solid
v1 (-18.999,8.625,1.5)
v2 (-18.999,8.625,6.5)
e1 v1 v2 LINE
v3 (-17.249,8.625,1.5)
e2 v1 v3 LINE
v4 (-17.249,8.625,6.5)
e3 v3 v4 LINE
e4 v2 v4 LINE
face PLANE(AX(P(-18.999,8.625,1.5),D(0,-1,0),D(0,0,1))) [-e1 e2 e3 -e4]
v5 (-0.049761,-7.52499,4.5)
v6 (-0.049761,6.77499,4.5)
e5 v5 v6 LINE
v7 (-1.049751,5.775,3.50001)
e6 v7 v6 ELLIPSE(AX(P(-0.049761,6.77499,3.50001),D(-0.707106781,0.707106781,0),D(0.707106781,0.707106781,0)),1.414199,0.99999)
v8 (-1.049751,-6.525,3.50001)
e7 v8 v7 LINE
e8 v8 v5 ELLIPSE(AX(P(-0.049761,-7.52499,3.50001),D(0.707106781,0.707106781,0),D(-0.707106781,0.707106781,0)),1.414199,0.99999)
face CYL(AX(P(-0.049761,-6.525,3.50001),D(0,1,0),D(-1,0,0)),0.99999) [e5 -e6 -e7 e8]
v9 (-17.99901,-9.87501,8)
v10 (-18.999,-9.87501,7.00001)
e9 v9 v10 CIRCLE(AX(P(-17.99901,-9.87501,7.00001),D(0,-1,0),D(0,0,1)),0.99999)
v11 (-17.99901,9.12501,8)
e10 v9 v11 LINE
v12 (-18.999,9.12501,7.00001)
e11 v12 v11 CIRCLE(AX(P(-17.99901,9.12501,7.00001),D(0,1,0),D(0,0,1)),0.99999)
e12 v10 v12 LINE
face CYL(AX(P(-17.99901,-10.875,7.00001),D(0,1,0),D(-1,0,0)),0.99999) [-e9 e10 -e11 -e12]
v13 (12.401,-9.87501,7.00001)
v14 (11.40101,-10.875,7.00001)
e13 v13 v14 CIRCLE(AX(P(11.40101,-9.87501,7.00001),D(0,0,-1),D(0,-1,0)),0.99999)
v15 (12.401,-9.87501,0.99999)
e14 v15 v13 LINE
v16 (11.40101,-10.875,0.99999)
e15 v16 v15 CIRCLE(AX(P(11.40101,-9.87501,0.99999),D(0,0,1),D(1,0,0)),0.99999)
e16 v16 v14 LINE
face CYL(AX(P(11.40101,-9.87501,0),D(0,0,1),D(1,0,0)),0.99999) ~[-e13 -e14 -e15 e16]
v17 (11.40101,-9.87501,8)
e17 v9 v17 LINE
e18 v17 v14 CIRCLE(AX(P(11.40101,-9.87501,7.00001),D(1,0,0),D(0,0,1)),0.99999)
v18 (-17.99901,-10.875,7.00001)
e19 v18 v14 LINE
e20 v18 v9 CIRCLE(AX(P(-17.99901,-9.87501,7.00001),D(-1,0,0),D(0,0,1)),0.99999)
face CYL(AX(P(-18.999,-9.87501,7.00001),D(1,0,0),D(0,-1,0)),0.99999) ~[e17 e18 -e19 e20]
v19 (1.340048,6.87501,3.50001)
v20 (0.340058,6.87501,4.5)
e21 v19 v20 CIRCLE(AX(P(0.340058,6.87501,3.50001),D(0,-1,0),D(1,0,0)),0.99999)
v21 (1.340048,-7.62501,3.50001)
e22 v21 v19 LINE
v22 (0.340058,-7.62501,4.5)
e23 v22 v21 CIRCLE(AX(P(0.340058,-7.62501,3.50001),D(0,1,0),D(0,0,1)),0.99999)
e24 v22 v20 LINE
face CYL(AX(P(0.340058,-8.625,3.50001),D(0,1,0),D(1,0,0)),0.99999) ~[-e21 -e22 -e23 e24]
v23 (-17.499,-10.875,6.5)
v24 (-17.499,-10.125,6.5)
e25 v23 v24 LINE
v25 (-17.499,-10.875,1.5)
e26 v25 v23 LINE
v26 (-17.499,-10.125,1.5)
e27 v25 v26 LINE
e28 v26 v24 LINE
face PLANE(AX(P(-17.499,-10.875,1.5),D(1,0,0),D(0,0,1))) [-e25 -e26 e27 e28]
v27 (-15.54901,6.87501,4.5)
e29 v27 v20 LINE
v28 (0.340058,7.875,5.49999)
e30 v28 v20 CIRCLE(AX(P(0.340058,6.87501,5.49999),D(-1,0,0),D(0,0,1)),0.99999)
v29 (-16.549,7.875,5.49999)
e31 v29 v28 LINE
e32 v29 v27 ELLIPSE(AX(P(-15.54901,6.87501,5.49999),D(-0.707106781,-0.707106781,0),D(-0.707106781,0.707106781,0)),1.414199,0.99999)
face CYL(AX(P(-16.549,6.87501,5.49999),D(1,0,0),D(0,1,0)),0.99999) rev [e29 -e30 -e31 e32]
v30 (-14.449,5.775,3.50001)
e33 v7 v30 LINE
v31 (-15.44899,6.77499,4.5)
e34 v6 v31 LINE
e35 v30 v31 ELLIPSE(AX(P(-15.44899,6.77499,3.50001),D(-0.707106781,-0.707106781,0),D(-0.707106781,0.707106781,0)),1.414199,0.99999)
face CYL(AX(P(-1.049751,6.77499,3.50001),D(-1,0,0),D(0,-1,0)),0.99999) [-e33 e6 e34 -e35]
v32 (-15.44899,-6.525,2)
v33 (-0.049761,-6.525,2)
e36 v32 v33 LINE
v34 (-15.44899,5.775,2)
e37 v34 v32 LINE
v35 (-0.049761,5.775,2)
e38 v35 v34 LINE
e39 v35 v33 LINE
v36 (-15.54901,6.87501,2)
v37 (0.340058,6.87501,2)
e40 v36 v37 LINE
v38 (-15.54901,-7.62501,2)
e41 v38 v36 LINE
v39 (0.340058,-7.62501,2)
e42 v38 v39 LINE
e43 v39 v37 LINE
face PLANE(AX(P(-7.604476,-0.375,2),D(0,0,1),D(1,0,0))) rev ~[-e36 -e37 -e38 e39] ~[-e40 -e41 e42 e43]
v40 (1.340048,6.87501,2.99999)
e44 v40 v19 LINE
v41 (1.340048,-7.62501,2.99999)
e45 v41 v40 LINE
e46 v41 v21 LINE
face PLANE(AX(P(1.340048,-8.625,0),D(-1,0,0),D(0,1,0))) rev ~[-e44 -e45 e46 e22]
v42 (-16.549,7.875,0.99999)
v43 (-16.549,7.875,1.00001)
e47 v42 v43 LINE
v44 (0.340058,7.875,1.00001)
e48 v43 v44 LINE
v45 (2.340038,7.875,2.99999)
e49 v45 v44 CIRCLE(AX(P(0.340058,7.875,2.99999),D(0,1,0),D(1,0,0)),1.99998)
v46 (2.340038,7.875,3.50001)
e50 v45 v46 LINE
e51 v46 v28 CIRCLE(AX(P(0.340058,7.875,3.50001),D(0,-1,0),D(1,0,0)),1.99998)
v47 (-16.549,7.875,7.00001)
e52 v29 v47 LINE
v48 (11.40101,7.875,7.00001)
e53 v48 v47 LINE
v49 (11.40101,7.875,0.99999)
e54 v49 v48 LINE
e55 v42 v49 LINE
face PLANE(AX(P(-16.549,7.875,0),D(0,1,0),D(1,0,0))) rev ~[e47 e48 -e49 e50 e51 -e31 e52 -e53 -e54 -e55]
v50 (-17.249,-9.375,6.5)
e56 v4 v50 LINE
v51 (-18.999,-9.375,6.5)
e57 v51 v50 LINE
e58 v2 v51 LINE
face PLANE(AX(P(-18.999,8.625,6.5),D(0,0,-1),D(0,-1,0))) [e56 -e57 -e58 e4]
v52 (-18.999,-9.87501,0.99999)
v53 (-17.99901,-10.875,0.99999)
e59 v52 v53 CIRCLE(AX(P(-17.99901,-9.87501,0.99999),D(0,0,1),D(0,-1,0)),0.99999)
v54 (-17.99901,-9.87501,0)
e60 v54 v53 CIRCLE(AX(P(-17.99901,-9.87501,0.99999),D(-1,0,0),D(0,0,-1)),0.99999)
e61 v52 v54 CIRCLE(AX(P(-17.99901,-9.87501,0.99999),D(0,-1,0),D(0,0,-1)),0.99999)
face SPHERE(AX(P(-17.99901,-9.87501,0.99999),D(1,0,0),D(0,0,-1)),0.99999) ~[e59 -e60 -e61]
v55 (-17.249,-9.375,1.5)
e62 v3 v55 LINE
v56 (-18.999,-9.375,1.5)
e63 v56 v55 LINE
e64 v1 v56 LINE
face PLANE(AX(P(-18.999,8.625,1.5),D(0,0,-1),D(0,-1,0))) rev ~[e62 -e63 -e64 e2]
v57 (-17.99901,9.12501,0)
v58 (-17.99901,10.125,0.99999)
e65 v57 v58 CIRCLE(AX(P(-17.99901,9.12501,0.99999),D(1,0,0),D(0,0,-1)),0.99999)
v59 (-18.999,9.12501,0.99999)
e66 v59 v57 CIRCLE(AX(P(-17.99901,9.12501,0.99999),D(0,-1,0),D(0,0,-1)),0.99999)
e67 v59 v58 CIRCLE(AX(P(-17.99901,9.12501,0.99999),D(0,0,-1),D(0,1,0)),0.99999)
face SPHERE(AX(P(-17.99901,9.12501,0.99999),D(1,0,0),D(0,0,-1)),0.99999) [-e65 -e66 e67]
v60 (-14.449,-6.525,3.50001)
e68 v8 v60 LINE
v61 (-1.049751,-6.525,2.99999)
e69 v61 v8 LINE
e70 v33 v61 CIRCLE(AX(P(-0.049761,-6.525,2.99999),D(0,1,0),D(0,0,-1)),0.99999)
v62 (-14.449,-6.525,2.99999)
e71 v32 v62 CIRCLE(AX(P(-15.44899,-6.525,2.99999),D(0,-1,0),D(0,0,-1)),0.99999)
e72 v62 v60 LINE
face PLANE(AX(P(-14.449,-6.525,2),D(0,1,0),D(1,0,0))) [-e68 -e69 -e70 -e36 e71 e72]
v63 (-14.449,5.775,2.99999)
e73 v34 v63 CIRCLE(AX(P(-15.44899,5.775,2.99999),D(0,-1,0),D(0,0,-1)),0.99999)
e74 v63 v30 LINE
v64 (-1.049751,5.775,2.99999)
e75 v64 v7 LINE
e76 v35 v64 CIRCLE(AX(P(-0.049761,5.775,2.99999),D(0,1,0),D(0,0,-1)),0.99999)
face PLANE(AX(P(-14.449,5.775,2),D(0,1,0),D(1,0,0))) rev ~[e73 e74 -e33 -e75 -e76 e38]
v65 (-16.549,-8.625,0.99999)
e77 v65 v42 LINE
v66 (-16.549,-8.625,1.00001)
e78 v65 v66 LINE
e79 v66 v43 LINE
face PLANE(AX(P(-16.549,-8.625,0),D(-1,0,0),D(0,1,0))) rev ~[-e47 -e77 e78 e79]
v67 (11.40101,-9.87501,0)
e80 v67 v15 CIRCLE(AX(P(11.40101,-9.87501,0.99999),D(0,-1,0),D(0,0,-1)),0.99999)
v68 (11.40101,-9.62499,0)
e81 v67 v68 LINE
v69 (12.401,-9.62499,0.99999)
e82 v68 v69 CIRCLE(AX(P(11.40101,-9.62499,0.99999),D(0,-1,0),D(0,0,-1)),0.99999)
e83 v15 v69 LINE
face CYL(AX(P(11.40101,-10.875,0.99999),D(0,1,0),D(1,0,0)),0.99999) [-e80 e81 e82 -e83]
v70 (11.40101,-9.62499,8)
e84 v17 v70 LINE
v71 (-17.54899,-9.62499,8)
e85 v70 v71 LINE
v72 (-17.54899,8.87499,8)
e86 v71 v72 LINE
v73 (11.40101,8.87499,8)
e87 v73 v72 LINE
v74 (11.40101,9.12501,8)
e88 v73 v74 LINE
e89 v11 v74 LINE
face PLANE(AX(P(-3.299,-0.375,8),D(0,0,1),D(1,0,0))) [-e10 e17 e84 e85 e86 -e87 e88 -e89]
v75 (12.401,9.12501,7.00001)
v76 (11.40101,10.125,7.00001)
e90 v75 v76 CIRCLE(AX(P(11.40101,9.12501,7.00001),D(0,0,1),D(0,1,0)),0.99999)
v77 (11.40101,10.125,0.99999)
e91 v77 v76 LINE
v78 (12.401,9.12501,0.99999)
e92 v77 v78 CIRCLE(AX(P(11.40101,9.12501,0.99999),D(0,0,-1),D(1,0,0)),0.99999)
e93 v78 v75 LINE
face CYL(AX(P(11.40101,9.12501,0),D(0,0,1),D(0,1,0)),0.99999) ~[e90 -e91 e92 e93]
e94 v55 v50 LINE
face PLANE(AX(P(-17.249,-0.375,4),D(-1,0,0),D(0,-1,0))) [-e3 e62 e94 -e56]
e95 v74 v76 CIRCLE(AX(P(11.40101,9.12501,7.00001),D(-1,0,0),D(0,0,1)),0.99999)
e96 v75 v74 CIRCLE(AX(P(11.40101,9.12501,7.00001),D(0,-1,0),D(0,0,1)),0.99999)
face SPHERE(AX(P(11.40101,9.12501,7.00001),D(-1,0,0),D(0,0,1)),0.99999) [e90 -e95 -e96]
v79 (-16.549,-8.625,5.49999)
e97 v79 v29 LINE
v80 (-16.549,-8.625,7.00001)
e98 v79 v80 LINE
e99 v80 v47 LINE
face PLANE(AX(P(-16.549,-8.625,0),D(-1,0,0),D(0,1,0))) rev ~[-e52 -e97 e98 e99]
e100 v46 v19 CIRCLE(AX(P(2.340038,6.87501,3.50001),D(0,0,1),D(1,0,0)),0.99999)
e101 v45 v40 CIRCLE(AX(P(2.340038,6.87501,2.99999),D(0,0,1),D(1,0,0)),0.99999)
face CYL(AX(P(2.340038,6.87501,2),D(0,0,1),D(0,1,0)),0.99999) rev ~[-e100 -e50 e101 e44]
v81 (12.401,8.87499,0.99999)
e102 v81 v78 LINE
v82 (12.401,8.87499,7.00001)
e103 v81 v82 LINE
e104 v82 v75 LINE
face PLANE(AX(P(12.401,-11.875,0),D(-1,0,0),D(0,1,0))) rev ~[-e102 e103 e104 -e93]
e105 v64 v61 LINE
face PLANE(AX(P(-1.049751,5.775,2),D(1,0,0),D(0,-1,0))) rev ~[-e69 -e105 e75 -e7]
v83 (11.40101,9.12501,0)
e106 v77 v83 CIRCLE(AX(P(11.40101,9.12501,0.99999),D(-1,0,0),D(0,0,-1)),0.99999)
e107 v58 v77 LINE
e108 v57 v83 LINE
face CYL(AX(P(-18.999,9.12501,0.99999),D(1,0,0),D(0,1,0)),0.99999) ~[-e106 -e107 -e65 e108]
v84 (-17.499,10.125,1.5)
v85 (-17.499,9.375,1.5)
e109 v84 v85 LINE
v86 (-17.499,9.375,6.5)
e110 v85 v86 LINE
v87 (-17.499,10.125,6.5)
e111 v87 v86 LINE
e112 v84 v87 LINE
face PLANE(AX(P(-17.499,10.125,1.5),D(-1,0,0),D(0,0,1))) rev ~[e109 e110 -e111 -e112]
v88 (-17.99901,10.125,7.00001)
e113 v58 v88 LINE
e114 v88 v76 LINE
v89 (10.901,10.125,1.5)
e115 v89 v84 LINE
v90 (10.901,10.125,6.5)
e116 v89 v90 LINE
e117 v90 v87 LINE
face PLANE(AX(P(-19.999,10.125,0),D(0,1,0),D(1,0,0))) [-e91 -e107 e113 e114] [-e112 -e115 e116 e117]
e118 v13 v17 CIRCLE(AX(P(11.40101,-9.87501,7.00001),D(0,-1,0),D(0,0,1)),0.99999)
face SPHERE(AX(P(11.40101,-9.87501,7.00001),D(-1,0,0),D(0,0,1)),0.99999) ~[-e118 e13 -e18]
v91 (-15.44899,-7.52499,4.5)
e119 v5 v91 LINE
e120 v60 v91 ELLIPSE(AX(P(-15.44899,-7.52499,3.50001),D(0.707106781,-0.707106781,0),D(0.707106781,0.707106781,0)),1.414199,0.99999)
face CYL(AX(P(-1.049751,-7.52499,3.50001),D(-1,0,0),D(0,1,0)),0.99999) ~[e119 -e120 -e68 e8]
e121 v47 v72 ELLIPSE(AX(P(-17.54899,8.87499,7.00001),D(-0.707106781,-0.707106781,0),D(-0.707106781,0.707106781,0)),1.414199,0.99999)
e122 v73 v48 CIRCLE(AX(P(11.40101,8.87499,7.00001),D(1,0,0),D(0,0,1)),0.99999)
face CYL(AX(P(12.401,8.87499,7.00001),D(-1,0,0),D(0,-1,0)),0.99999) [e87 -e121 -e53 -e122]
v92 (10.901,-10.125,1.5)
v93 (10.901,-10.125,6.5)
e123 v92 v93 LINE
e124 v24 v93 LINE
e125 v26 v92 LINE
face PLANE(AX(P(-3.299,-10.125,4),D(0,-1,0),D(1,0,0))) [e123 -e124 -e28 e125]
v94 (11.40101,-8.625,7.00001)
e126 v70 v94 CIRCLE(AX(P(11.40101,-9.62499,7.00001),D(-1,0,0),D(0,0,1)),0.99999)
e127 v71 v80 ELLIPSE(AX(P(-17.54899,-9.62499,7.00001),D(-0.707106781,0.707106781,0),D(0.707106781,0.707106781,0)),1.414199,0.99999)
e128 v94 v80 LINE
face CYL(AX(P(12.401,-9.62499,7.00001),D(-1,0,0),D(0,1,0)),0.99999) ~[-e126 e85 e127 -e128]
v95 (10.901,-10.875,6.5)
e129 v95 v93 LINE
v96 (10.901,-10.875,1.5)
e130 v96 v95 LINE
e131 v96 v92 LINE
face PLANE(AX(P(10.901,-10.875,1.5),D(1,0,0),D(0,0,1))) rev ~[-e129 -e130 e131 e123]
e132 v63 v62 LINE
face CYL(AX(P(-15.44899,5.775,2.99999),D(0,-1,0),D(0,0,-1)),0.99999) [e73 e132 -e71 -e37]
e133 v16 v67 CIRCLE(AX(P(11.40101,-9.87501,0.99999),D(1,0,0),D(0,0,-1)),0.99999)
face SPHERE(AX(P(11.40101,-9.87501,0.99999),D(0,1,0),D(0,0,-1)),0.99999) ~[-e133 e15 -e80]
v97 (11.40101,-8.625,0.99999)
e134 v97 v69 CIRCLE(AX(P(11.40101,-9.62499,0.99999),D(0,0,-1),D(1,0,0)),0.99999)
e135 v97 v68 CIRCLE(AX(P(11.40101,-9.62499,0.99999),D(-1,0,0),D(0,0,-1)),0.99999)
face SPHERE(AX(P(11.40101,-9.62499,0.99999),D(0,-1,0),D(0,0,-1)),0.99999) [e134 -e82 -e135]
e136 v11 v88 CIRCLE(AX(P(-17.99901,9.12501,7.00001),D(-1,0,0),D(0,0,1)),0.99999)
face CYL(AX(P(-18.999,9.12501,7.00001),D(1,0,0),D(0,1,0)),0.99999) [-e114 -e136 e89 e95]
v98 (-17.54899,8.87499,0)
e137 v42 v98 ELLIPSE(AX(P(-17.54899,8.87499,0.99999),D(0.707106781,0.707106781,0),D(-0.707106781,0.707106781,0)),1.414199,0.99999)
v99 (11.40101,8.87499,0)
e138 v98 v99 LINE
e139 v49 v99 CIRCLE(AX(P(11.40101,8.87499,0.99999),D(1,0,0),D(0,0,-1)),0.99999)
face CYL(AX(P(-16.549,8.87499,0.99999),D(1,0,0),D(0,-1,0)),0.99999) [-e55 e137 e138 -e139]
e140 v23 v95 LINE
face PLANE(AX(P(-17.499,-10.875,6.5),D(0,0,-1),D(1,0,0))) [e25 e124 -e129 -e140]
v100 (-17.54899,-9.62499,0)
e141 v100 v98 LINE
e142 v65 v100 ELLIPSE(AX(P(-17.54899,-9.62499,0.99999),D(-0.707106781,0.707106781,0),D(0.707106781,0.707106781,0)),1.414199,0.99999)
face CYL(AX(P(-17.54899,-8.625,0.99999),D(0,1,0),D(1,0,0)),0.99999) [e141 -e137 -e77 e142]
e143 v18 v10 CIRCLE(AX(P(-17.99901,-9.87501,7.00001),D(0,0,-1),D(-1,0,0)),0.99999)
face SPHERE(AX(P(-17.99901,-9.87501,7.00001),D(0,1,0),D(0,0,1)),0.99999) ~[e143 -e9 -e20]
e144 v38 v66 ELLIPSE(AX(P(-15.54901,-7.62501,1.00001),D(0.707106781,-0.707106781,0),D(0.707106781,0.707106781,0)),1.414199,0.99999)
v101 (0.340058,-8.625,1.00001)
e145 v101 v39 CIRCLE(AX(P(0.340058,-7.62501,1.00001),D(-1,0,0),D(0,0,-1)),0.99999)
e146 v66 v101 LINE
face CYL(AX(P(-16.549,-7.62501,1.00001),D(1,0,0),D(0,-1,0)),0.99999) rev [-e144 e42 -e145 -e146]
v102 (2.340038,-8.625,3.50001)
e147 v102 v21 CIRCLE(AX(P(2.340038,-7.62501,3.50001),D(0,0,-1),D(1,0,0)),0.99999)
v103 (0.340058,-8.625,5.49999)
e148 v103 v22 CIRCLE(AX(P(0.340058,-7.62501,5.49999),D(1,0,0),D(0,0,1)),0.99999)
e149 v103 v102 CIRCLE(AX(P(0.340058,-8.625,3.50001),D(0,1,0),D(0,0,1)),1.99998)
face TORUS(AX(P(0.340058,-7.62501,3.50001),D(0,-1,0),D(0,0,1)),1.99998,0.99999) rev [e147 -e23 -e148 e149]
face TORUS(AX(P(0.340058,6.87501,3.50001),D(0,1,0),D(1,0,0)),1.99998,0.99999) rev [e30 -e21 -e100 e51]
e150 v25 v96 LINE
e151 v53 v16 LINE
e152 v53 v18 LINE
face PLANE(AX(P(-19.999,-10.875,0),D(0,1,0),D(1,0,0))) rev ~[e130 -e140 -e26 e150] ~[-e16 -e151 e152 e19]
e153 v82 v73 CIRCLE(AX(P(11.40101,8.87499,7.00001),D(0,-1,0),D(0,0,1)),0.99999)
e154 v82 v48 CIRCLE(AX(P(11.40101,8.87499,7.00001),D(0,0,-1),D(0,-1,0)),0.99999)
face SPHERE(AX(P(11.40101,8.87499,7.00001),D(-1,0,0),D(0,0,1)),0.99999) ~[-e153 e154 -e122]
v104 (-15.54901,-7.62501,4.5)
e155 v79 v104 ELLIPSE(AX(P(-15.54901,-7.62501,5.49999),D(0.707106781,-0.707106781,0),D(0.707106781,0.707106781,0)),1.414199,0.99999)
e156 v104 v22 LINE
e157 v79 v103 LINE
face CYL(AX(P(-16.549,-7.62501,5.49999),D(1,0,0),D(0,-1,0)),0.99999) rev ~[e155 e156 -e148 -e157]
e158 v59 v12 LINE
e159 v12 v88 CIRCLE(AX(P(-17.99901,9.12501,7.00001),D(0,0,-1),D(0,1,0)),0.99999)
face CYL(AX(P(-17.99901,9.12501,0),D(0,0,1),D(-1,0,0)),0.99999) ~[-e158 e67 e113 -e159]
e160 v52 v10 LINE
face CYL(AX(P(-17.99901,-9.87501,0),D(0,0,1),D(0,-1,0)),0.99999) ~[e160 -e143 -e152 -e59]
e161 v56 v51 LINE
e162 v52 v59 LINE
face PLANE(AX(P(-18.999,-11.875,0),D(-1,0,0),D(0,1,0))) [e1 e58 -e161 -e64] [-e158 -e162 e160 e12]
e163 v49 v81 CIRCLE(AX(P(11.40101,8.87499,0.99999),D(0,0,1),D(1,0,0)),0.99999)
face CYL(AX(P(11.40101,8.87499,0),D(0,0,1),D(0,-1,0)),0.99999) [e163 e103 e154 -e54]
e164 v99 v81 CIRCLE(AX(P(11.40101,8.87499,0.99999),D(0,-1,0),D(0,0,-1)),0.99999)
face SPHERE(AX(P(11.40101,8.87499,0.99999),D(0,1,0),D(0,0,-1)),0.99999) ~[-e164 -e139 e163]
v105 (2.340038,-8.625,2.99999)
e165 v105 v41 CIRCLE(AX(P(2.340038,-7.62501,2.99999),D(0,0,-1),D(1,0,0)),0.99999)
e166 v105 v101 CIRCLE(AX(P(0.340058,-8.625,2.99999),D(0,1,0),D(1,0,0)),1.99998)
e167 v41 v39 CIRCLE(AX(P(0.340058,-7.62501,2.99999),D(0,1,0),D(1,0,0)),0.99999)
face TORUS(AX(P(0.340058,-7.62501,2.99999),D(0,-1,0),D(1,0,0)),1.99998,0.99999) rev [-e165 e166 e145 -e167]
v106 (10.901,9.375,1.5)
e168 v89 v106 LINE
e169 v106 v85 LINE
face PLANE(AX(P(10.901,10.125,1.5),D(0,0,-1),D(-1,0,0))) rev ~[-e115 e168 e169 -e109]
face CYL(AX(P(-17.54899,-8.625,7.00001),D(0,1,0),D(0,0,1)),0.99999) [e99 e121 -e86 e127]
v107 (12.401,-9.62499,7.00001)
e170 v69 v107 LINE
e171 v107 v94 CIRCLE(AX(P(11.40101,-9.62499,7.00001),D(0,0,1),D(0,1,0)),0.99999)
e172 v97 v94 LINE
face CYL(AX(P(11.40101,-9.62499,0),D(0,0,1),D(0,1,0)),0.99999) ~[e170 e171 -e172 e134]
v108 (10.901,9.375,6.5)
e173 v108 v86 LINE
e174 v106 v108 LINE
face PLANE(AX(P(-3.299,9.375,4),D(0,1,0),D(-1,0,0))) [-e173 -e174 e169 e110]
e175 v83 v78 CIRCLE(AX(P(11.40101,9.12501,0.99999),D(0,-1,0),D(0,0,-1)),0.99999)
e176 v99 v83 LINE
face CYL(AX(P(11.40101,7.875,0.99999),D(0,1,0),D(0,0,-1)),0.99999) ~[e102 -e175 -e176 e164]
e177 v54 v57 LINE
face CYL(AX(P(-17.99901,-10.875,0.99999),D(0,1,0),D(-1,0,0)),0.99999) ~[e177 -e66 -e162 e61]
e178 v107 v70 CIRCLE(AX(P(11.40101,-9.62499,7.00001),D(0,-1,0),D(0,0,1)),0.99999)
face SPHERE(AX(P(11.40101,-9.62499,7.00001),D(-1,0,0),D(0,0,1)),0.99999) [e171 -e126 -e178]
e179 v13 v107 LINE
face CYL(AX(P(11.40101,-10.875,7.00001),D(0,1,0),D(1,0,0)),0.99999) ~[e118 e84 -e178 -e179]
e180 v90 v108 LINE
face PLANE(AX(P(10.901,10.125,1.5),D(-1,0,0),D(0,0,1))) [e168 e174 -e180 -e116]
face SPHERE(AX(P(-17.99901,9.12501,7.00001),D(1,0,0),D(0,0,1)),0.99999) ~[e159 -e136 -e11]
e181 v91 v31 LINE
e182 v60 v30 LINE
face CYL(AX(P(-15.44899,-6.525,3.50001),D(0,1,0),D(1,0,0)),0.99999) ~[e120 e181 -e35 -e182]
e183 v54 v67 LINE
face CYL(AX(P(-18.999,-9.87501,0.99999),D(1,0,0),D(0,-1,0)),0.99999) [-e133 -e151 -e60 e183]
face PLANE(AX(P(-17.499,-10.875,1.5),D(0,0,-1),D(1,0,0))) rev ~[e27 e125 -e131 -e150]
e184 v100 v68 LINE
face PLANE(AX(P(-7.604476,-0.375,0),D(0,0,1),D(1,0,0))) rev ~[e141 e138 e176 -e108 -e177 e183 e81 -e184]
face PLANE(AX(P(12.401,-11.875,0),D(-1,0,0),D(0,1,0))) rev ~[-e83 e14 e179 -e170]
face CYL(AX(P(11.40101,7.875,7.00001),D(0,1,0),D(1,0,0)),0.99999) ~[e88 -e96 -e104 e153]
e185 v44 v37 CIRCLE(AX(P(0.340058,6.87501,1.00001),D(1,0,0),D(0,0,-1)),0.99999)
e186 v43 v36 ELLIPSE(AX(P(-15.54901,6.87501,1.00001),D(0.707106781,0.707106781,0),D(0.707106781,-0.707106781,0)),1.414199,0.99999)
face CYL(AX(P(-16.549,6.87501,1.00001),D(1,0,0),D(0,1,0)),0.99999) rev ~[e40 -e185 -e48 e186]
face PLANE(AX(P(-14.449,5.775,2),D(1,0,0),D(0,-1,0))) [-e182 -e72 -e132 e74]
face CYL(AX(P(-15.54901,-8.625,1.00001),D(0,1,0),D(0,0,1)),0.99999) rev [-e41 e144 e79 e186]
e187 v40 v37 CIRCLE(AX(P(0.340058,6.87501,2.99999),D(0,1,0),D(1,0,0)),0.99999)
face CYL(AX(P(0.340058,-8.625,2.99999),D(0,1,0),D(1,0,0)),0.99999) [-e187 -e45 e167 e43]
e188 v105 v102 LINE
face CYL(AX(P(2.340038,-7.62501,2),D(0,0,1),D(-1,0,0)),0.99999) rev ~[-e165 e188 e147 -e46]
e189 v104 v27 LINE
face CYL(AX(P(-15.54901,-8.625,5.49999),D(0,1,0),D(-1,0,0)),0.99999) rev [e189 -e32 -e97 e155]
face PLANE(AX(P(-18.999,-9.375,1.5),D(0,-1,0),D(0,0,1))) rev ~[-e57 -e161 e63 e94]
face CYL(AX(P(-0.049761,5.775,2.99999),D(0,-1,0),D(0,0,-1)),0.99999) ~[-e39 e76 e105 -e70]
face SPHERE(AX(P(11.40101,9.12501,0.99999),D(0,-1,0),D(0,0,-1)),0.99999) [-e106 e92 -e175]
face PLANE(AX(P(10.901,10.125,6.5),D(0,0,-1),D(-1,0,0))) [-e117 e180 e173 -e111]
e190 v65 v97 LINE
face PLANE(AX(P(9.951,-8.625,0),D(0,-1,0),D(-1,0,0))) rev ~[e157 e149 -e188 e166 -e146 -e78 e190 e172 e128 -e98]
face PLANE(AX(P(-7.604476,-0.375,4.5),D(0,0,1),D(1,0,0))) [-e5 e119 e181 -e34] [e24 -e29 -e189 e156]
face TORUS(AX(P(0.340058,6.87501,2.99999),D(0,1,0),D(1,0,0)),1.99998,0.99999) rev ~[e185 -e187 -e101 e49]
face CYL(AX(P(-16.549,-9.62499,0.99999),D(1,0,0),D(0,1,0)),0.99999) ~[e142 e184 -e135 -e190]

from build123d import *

# Parameters (mm, degrees)
F0_W      = 33.4
F0_H      = 23
F1_DEPTH  = 8
F0_W_2    = 17.8890476892
F0_H_2    = 16.5
F2_DEPTH  = 4.5
F3_DEPTH  = 1
F4_DEPTH  = 1
F5_DEPTH  = 1
F6_DEPTH  = 1
F7_DEPTH  = 2
F8_W      = 13.3992488682
F8_H      = 12.2999999374
F9_DEPTH  = 3.4
F11_W     = 28.4
F11_H     = 5
F12_DEPTH = 0.75
F13_W     = 28.4
F13_H     = 5
F14_DEPTH = 0.75
F15_W     = 18
F15_H     = 5
F16_DEPTH = 1.75
F10_W     = 16.5
F10_H     = 8
F17_DEPTH = 2.5
F18_R     = 0.99999


# Not quite as in the source:
# - a fillet or chamfer is up to 0.001 mm smaller than in the source, because OpenCascade refuses the exact size
# - a feature names something its author has since deleted; it is built from what else it names


with BuildPart() as f1:
    # F0 (on Top) → F1 (new body)
    with BuildSketch(Plane.XY):
        with Locations((-3.299, -0.375)):
            Rectangle(F0_W, F0_H)
        Polygon((1.3400476892, 7.875), (9.951, 7.875), (9.951, -8.625), (1.3400476892, -8.625), (-16.549, -8.625), (-16.549, 7.875), align=None, mode=Mode.SUBTRACT)
    extrude(amount=F1_DEPTH)

    # F0 (on Top) → F2 (join)
    with BuildSketch(Plane.XY):
        with Locations((-7.6044761554, -0.375)):
            Rectangle(F0_W_2, F0_H_2)
    extrude(amount=F2_DEPTH)

    # F3 (cut): a face of the model
    f3_faces = [f1.faces().sort_by_distance(p)[0] for p in [
        (-3.299, -11.875, 4),
    ]]
    extrude(f3_faces, amount=-F3_DEPTH, mode=Mode.SUBTRACT)

    # F4 (cut): a face of the model
    f4_faces = [f1.faces().sort_by_distance(p)[0] for p in [
        (13.401, 0.125, 4),
    ]]
    extrude(f4_faces, amount=-F4_DEPTH, mode=Mode.SUBTRACT)

    # F5 (cut): a face of the model
    f5_faces = [f1.faces().sort_by_distance(p)[0] for p in [
        (-3.799, 11.125, 4),
    ]]
    extrude(f5_faces, amount=-F5_DEPTH, mode=Mode.SUBTRACT)

    # F6 (cut): a face of the model
    f6_faces = [f1.faces().sort_by_distance(p)[0] for p in [
        (-19.999, -0.375, 4),
    ]]
    extrude(f6_faces, amount=-F6_DEPTH, mode=Mode.SUBTRACT)

    # F0 (on Top) → F7 (cut)
    with BuildSketch(Plane.XY):
        with Locations((-7.6044761554, -0.375)):
            Rectangle(F0_W_2, F0_H_2)
    extrude(amount=F7_DEPTH, mode=Mode.SUBTRACT)

    # F8 (on face) → F9 (cut)
    with BuildSketch(Plane(origin=(0, 0, 2), x_dir=(1, 0, 0), z_dir=(0, 0, -1))):
        with Locations((-7.7493755346, 0.375)):
            Rectangle(F8_W, F8_H)
    extrude(amount=-F9_DEPTH, mode=Mode.SUBTRACT)

    # F11 (on face) → F12 (cut)
    with BuildSketch(Plane.XZ.offset(10.875)):
        with Locations((-3.299, 4)):
            Rectangle(F11_W, F11_H)
    extrude(amount=-F12_DEPTH, mode=Mode.SUBTRACT)

    # F13 (on face) → F14 (cut)
    with BuildSketch(Plane(origin=(0, 10.125, 0), x_dir=(-1, 0, 0), z_dir=(0, 1, 0))):
        with Locations((3.299, 4)):
            Rectangle(F13_W, F13_H)
    extrude(amount=-F14_DEPTH, mode=Mode.SUBTRACT)

    # F15 (on face) → F16 (cut)
    with BuildSketch(Plane(origin=(-18.999, 0, 0), x_dir=(0, -1, 0), z_dir=(-1, 0, 0))):
        with Locations((0.375, 4)):
            Rectangle(F15_W, F15_H)
    extrude(amount=-F16_DEPTH, mode=Mode.SUBTRACT)

    # F10 (on face) → F17 (cut)
    with BuildSketch(Plane.YZ.offset(12.401)):
        with Locations((-0.375, 4)):
            Rectangle(F10_W, F10_H)
    extrude(amount=-F17_DEPTH, mode=Mode.SUBTRACT)

    # F18 (radius 1 in the source; OpenCascade refuses exactly that, so slightly less here)
    f18_edges = [f1.edges().sort_by_distance(p)[0] for p in [
        (-3.299, 10.125, 8),
        (-2.074, 7.875, 8),
        (-18.999, -0.375, 8),
        (-16.549, -0.375, 8),
        (-2.074, -8.625, 8),
        (-3.299, -10.875, 8),
        (12.401, -9.75, 8),
        (12.401, 9, 8),
        (12.401, 9, 0),
        (12.401, -9.75, 0),
        (-3.299, 10.125, 0),
        (-3.299, -10.875, 0),
        (-18.999, -0.375, 0),
        (-2.074, -8.625, 0),
        (-16.549, -0.375, 0),
        (-2.074, 7.875, 0),
        (12.401, -10.875, 4),
        (12.401, -8.625, 4),
        (12.401, 7.875, 4),
        (12.401, 10.125, 4),
        (-18.999, -10.875, 4),
        (-18.999, 10.125, 4),
        (-14.449, -0.375, 4.5),
        (-1.049751, -0.375, 4.5),
        (-7.604476, 7.875, 2),
        (-16.549, -0.375, 2),
        (-7.604476, -8.625, 2),
        (-1.049751, -0.375, 2),
        (-14.449, -0.375, 2),
        (-16.549, -0.375, 4.5),
        (1.340048, -0.375, 4.5),
        (1.340048, -0.375, 2),
        (1.340048, 7.875, 3.25),
        (-7.604476, 7.875, 4.5),
        (-7.604476, -8.625, 4.5),
        (-7.749376, -6.525, 4.5),
        (-7.749376, 5.775, 4.5),
        (1.340048, -8.625, 3.25),
    ]]
    fillet(f18_edges, radius=F18_R)


solid = f1.part
